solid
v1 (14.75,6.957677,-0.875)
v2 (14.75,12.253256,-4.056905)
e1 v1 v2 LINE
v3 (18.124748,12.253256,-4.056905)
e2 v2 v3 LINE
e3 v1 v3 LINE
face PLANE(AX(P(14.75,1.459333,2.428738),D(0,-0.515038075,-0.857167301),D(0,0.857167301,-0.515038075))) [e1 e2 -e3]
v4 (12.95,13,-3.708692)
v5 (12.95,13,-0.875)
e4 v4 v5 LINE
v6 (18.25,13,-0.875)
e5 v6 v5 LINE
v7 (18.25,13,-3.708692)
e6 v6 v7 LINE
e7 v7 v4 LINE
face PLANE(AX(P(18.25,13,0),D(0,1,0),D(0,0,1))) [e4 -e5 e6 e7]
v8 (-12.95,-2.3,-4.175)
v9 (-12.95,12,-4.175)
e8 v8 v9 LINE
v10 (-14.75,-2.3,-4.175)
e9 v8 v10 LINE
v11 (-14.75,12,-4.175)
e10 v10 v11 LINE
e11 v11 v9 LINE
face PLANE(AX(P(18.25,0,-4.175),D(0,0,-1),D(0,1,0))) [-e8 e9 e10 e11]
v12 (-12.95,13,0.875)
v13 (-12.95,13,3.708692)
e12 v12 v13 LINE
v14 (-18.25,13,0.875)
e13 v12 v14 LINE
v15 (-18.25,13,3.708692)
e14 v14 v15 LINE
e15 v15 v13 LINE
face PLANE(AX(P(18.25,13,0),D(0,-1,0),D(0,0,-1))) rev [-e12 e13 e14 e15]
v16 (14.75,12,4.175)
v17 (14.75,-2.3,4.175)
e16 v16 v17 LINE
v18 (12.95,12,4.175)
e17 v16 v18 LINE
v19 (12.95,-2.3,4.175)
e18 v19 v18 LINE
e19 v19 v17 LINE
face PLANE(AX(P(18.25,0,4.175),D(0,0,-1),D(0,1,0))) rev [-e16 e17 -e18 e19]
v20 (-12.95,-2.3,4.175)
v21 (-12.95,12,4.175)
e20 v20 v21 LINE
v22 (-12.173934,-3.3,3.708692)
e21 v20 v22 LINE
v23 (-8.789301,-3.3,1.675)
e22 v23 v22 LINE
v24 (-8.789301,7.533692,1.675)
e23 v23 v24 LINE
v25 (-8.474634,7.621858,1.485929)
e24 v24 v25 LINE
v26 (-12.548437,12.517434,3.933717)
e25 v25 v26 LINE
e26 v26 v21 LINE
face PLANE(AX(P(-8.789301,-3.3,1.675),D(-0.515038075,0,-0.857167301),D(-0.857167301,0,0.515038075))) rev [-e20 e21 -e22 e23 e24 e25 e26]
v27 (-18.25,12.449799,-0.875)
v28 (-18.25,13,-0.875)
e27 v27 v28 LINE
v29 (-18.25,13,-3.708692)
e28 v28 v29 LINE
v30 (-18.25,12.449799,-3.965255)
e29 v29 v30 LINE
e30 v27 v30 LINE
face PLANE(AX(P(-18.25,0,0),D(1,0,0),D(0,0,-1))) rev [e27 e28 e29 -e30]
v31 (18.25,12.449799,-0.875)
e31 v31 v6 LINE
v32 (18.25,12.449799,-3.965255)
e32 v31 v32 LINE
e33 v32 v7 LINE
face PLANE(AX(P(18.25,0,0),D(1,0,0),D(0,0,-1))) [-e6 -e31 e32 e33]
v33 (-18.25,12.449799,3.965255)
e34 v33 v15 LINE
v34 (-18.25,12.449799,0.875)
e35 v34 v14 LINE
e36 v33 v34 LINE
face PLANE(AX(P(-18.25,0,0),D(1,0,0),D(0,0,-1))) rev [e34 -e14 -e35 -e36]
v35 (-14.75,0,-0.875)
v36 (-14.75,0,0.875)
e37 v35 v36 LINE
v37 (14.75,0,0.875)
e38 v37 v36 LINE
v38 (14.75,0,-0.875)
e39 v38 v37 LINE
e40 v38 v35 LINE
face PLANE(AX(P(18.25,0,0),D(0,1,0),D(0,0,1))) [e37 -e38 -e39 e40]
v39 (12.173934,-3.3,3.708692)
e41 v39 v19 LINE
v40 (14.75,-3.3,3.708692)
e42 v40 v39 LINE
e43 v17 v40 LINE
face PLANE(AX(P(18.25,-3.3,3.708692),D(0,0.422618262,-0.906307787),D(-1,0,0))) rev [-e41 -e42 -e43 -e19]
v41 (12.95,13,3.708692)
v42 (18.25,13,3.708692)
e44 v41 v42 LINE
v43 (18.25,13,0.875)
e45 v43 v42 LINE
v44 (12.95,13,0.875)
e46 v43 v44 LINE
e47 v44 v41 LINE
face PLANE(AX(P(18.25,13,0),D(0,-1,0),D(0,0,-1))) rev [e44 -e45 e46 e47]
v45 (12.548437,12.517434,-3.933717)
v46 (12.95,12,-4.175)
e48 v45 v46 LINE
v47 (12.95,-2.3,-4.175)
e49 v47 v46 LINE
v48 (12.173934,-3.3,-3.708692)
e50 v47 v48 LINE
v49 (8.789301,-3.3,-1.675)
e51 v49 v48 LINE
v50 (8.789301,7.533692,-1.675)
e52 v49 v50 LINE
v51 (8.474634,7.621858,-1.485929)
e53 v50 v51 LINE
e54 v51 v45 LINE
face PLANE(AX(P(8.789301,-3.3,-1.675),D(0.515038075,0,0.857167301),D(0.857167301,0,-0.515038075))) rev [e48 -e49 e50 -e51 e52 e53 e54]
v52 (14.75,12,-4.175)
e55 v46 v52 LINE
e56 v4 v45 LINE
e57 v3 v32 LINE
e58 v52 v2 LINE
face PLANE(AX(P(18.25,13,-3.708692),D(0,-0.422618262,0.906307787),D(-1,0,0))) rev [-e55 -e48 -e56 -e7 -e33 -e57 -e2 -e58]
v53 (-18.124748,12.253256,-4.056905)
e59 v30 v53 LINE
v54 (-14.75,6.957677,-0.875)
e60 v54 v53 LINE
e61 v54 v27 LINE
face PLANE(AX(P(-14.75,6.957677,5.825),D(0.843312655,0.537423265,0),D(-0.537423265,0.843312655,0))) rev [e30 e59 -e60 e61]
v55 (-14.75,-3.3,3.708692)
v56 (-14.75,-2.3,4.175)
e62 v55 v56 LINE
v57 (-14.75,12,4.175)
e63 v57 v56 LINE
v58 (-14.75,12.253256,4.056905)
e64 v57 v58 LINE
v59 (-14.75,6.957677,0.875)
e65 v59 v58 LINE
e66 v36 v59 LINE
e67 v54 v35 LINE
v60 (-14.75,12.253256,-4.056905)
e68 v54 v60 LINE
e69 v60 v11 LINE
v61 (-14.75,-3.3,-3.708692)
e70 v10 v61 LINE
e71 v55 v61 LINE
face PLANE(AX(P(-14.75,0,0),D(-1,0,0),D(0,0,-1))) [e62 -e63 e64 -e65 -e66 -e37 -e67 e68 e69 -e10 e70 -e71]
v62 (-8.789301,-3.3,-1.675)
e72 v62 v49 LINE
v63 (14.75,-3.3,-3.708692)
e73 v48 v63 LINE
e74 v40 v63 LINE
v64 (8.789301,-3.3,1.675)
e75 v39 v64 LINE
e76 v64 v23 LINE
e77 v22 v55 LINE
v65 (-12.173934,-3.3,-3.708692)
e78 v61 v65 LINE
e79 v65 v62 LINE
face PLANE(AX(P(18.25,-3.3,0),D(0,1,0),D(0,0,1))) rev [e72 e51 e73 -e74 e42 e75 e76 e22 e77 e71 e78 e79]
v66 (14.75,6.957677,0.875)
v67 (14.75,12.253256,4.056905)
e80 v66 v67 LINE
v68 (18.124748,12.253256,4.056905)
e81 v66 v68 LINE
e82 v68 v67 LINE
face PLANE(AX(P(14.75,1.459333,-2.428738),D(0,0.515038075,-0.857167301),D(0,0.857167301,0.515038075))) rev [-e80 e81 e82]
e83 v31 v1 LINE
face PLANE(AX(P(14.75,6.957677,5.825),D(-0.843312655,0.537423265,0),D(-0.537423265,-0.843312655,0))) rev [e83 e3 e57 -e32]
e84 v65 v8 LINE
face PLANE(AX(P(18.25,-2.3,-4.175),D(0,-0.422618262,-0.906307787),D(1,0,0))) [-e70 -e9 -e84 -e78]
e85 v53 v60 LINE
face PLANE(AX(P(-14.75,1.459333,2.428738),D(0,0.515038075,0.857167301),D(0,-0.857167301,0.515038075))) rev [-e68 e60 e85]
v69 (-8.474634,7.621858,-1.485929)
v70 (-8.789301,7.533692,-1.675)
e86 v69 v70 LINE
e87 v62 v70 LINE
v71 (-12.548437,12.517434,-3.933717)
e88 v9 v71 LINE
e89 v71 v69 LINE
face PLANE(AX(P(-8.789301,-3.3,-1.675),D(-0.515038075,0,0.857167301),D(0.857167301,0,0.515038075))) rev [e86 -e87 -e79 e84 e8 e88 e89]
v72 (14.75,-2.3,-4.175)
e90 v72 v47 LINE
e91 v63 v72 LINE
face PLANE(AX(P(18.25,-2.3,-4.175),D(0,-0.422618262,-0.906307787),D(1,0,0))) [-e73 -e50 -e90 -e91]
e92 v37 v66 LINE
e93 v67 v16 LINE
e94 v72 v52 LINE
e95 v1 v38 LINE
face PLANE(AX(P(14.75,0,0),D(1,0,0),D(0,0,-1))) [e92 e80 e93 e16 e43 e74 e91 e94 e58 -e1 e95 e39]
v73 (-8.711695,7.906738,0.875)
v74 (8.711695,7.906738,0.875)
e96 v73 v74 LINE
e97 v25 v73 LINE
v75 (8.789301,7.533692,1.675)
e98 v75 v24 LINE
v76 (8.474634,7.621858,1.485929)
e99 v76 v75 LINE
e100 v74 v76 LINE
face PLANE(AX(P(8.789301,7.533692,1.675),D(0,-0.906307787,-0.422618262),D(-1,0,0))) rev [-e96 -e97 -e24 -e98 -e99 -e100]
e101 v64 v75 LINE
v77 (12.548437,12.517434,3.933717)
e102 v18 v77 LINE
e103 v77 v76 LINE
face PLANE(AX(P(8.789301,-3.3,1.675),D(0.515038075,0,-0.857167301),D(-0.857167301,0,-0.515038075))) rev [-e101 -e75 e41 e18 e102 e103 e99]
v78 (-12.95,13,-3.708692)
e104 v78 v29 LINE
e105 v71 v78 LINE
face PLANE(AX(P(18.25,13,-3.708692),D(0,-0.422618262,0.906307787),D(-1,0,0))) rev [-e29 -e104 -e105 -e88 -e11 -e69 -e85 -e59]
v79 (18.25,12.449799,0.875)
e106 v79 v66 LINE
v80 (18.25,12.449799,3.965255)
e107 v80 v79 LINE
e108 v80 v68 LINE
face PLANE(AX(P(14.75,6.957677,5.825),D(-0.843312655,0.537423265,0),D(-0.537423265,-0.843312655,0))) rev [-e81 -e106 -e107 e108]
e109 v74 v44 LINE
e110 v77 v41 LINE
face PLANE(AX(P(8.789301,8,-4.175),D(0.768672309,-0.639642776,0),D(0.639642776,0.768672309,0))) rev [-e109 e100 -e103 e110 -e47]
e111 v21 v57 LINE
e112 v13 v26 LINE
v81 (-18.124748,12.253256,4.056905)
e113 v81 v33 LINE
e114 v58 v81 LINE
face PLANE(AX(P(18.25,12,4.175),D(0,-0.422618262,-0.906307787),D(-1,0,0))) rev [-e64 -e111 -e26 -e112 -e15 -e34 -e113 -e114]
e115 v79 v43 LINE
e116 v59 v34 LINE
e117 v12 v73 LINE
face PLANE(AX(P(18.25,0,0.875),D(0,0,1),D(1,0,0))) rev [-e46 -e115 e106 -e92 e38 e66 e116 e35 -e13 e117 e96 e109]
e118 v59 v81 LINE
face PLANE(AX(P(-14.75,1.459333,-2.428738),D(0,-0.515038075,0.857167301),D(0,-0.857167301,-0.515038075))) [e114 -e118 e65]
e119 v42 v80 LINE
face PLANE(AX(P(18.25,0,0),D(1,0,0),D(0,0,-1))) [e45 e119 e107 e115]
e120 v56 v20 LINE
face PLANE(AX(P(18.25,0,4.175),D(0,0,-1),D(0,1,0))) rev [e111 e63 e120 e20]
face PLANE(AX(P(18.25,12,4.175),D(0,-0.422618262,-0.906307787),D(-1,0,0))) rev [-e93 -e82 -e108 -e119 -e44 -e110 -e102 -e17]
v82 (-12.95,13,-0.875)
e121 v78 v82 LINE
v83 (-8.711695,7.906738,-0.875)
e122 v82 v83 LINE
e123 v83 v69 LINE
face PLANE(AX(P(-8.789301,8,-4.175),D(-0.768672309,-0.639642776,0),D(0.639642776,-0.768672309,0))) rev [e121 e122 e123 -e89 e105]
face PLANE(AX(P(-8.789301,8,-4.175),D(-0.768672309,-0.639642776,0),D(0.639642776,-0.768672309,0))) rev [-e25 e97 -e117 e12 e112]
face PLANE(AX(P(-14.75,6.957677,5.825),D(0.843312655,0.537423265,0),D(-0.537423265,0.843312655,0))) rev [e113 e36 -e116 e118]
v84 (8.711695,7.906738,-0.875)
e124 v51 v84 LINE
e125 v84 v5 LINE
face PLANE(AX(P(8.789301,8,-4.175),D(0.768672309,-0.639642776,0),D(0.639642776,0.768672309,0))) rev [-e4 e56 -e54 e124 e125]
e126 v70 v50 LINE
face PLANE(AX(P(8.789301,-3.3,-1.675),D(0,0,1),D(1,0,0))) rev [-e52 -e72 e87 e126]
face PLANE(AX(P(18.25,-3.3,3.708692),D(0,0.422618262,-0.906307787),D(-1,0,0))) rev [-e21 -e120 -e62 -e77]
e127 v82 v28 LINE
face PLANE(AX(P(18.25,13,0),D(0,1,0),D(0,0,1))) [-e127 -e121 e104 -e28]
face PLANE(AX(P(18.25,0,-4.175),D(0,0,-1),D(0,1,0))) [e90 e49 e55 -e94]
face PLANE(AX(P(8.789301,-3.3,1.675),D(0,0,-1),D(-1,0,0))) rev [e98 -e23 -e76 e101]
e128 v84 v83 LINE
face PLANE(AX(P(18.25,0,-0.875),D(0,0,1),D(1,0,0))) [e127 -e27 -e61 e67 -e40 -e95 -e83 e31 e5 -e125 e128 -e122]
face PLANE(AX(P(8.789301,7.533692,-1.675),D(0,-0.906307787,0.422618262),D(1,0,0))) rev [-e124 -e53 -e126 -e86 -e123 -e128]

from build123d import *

# Parameters (mm, degrees)
SALIENTE_EXTRUIR1_DEPTH = 18.25
CORTAR_EXTRUIR1_START   = -1.8
CORTAR_EXTRUIR1_DEPTH   = 1.7
CORTAR_EXTRUIR2_DEPTH   = 25.823036176
CORTAR_EXTRUIR3_DEPTH   = 24.912026263
CORTAR_EXTRUIR4_REACH   = 37.713
CORTAR_EXTRUIR5_DEPTH   = 10
CHAFL_N2_SIZE           = 1
CHAFL_N2_SIZE_2         = 0.466307658


with BuildPart() as part:
    # Croquis2 → Saliente-Extruir1 (new, symmetric)
    with BuildSketch(Plane(origin=(0, 0, 0), x_dir=(0, 0, -1), z_dir=(1, 0, 0))):
        Polygon((0.875, 0), (0, 0), (0, -3.3), (0.875, -3.3), (4.175, 2.192122292), (4.175, 13), (0.875, 13), align=None)
        Polygon((0, 0), (-0.875, 0), (-0.875, 13), (-4.175, 13), (-4.175, 2.192122292), (-0.875, -3.3), (0, -3.3), align=None)
        Polygon((-4.175, -3.3), (-4.175, 2.192122292), (-0.875, -3.3), align=None)
        Polygon((4.175, -3.3), (0.875, -3.3), (4.175, 2.192122292), align=None)
    extrude(amount=SALIENTE_EXTRUIR1_DEPTH, both=True)

    # Croquis3 → Cortar-Extruir1 (cut)
    with BuildSketch(Plane(origin=(18.25, 0, 0), x_dir=(0, 0, -1), z_dir=(1, 0, 0)).offset(CORTAR_EXTRUIR1_START)):
        Polygon((0, -3.3), (0, 0), (-0.875, 0), (-0.875, 6.957676858), (-4.175, 12.449799149), (-4.175, -3.3), align=None)
        Polygon((0.875, 0), (0, 0), (0, -3.3), (4.175, -3.3), (4.175, 12.449799149), (0.875, 6.957676858), align=None)
    cortar_extruir1 = extrude(amount=-CORTAR_EXTRUIR1_DEPTH, mode=Mode.SUBTRACT)

    # Simetría1: Cortar-Extruir1 across plane
    add(cortar_extruir1.mirror(Plane(origin=(0, 0, 0), x_dir=(0, 0, 1), z_dir=(1, 0, 0))), mode=Mode.SUBTRACT)

    # Croquis4 → Cortar-Extruir2 (cut, through all)
    with BuildSketch(Plane(origin=(0, 13, 0), x_dir=(1, 0, 0), z_dir=(0, 1, 0))):
        Polygon((8.789301294, -1.675), (-8.789301294, -1.675), (-12.95, -4.175), (12.95, -4.175), align=None)
        Polygon((8.789301294, 1.675), (12.95, 4.175), (-12.95, 4.175), (-8.789301294, 1.675), align=None)
    extrude(amount=-CORTAR_EXTRUIR2_DEPTH, mode=Mode.SUBTRACT)

    # Croquis5 → Cortar-Extruir3 (cut, through all)
    with BuildSketch(Plane.XY.offset(4.175)):
        Polygon((-12.95, 13), (12.95, 13), (8.789301294, 8), (-8.789301294, 8), align=None)
    extrude(amount=-CORTAR_EXTRUIR3_DEPTH, mode=Mode.SUBTRACT)

    # Croquis6 → Cortar-Extruir4 (cut, up to next)
    with BuildSketch(Plane(origin=(14.75, 0, 0), x_dir=(0, 0, -1), z_dir=(1, 0, 0)), mode=Mode.PRIVATE) as cortar_extruir4_sk1:
        Polygon((-4.175, -3.3), (4.175, -3.3), (4.175, 12.449799149), (0.875, 6.957676858), (0.875, 0), (-0.875, 0), (-0.875, 6.957676858), (-4.175, 12.449799149), align=None)
    cortar_extruir4_tool1 = extrude(cortar_extruir4_sk1.sketch, amount=CORTAR_EXTRUIR4_REACH, mode=Mode.PRIVATE) & part.part
    cortar_extruir4 = cortar_extruir4_tool1.solids().sort_by_distance((14.75, -3.121737, 0))[0]
    add(cortar_extruir4, mode=Mode.SUBTRACT)

    # Simetría2: Cortar-Extruir4 across plane
    add(cortar_extruir4.mirror(Plane(origin=(0, 0, 0), x_dir=(0, 0, 1), z_dir=(1, 0, 0))), mode=Mode.SUBTRACT)

    # Croquis7 → Cortar-Extruir5 (cut)
    with BuildSketch(Plane(origin=(0, 0, -4.175), x_dir=(-1, 0, 0), z_dir=(0, 0, -1))):
        Polygon((14.75, 6.957676858), (18.25, 12.449799149), (18.25, 6.957676858), align=None)
        Polygon((-18.25, 6.957676858), (-14.75, 6.957676858), (-18.25, 12.449799149), align=None)
    extrude(amount=-CORTAR_EXTRUIR5_DEPTH, mode=Mode.SUBTRACT)

    # Chaflán2
    # the kernel refuses this chamfer: 1, 0.466307658 mm, written as the material it takes off along each edge
    with BuildSketch(Plane(origin=(-11.380276766, 8, 1.675), x_dir=(0, 0.01631116413111048, -0.9998669641130704), z_dir=(1, 0, 0))) as chafl_n2_piece_1_section:
        Polygon((CHAFL_N2_SIZE * 0.999866964113, -CHAFL_N2_SIZE * 0.0163111641311), (-CHAFL_N2_SIZE_2 * 0.0163111641365, -CHAFL_N2_SIZE_2 * 0.999866964445), (0, 0), align=None)
    chafl_n2_piece_1 = extrude(amount=22.760553531, mode=Mode.PRIVATE)
    chafl_n2_piece_1 = split(chafl_n2_piece_1, bisect_by=Plane(origin=(-8.557096722, 7.720954834, 1.652220127), z_dir=(-0.7686723090596509, -0.6396427763094841, 0)), keep=Keep.TOP, mode=Mode.PRIVATE)
    chafl_n2_piece_1 = split(chafl_n2_piece_1, bisect_by=Plane(origin=(-8.661655422, 7.660906137, 1.598302622), z_dir=(0.5150380749100552, 0, 0.8571673007021118)), keep=Keep.TOP, mode=Mode.PRIVATE)
    add(chafl_n2_piece_1, mode=Mode.SUBTRACT)
    with BuildSketch(Plane(origin=(-11.380276766, 8, 1.675), x_dir=(0, 0.01631116413111048, -0.9998669641130704), z_dir=(1, 0, 0))) as chafl_n2_piece_2_section:
        Polygon((CHAFL_N2_SIZE * 0.999866964113, -CHAFL_N2_SIZE * 0.0163111641311), (-CHAFL_N2_SIZE_2 * 0.0163111641365, -CHAFL_N2_SIZE_2 * 0.999866964445), (0, 0), align=None)
    chafl_n2_piece_2 = extrude(amount=22.760553531, mode=Mode.PRIVATE)
    chafl_n2_piece_2 = split(chafl_n2_piece_2, bisect_by=Plane(origin=(-8.541684452, 7.702433581, 1.094162821), z_dir=(0.7686723090596509, 0.6396427763094841, 0)), keep=Keep.TOP, mode=Mode.PRIVATE)
    chafl_n2_piece_2 = split(chafl_n2_piece_2, bisect_by=Plane(origin=(-8.154722375, 7.924668255, 1.293706518), z_dir=(-0.5150380749100552, 0, -0.8571673007021118)), keep=Keep.TOP, mode=Mode.PRIVATE)
    add(chafl_n2_piece_2, mode=Mode.SUBTRACT)
    with BuildSketch(Plane(origin=(-11.380276766, 8, 1.675), x_dir=(0, 0.01631116413111048, -0.9998669641130704), z_dir=(1, 0, 0))) as chafl_n2_piece_3_section:
        Polygon((CHAFL_N2_SIZE * 0.999866964113, -CHAFL_N2_SIZE * 0.0163111641311), (-CHAFL_N2_SIZE_2 * 0.0163111641365, -CHAFL_N2_SIZE_2 * 0.999866964445), (0, 0), align=None)
    chafl_n2_piece_3 = extrude(amount=22.760553531, mode=Mode.PRIVATE)
    chafl_n2_piece_3 = split(chafl_n2_piece_3, bisect_by=Plane(origin=(-5.119611659, 3.590056028, 1.349077222), z_dir=(0.7686723090596509, 0.6396427763094841, 0)), keep=Keep.TOP, mode=Mode.PRIVATE)
    chafl_n2_piece_3 = split(chafl_n2_piece_3, bisect_by=Plane(origin=(5.119611659, 3.590056028, 1.349077222), z_dir=(-0.768672309059651, 0.6396427763094839, 0)), keep=Keep.TOP, mode=Mode.PRIVATE)
    chafl_n2_piece_3 = split(chafl_n2_piece_3, bisect_by=Plane(origin=(2.187600774, 7.850288348, -2.291701861), z_dir=(-0.5150380749100552, 0, 0.8571673007021118)), keep=Keep.TOP, mode=Mode.PRIVATE)
    chafl_n2_piece_3 = split(chafl_n2_piece_3, bisect_by=Plane(origin=(-2.187600774, 7.850288348, -2.291701861), z_dir=(0.5150380749100552, 0, 0.8571673007021118)), keep=Keep.TOP, mode=Mode.PRIVATE)
    add(chafl_n2_piece_3, mode=Mode.SUBTRACT)
    with BuildSketch(Plane(origin=(-11.380276766, 8, 1.675), x_dir=(0, 0.01631116413111048, -0.9998669641130704), z_dir=(1, 0, 0))) as chafl_n2_piece_4_section:
        Polygon((CHAFL_N2_SIZE * 0.999866964113, -CHAFL_N2_SIZE * 0.0163111641311), (-CHAFL_N2_SIZE_2 * 0.0163111641365, -CHAFL_N2_SIZE_2 * 0.999866964445), (0, 0), align=None)
    chafl_n2_piece_4 = extrude(amount=22.760553531, mode=Mode.PRIVATE)
    chafl_n2_piece_4 = split(chafl_n2_piece_4, bisect_by=Plane(origin=(8.557096722, 7.720954834, 1.652220127), z_dir=(0.768672309059651, -0.6396427763094839, 0)), keep=Keep.TOP, mode=Mode.PRIVATE)
    chafl_n2_piece_4 = split(chafl_n2_piece_4, bisect_by=Plane(origin=(8.661655422, 7.660906137, 1.598302622), z_dir=(-0.5150380749100552, 0, 0.8571673007021118)), keep=Keep.TOP, mode=Mode.PRIVATE)
    add(chafl_n2_piece_4, mode=Mode.SUBTRACT)
    with BuildSketch(Plane(origin=(-11.380276766, 8, 1.675), x_dir=(0, 0.01631116413111048, -0.9998669641130704), z_dir=(1, 0, 0))) as chafl_n2_piece_5_section:
        Polygon((CHAFL_N2_SIZE * 0.999866964113, -CHAFL_N2_SIZE * 0.0163111641311), (-CHAFL_N2_SIZE_2 * 0.0163111641365, -CHAFL_N2_SIZE_2 * 0.999866964445), (0, 0), align=None)
    chafl_n2_piece_5 = extrude(amount=22.760553531, mode=Mode.PRIVATE)
    chafl_n2_piece_5 = split(chafl_n2_piece_5, bisect_by=Plane(origin=(8.541684452, 7.702433581, 1.094162821), z_dir=(-0.768672309059651, 0.6396427763094839, 0)), keep=Keep.TOP, mode=Mode.PRIVATE)
    chafl_n2_piece_5 = split(chafl_n2_piece_5, bisect_by=Plane(origin=(8.154722375, 7.924668255, 1.293706518), z_dir=(0.5150380749100552, 0, -0.8571673007021118)), keep=Keep.TOP, mode=Mode.PRIVATE)
    add(chafl_n2_piece_5, mode=Mode.SUBTRACT)
    with BuildSketch(Plane(origin=(11.380276766, 8, -1.675), x_dir=(0, -0.9971975577536775, -0.0748133063705994), z_dir=(-1, 0, 0))) as chafl_n2_piece_6_section:
        Polygon((CHAFL_N2_SIZE_2 * 0.997197558085, CHAFL_N2_SIZE_2 * 0.0748133063955), (-CHAFL_N2_SIZE * 0.0748133063706, CHAFL_N2_SIZE * 0.997197557754), (0, 0), align=None)
    chafl_n2_piece_6 = extrude(amount=22.760553531, mode=Mode.PRIVATE)
    chafl_n2_piece_6 = split(chafl_n2_piece_6, bisect_by=Plane(origin=(8.541684452, 7.702433581, -1.094162821), z_dir=(-0.768672309059651, 0.6396427763094839, 0)), keep=Keep.TOP, mode=Mode.PRIVATE)
    chafl_n2_piece_6 = split(chafl_n2_piece_6, bisect_by=Plane(origin=(8.154722375, 7.924668255, -1.293706518), z_dir=(0.5150380749100552, 0, 0.8571673007021118)), keep=Keep.TOP, mode=Mode.PRIVATE)
    add(chafl_n2_piece_6, mode=Mode.SUBTRACT)
    with BuildSketch(Plane(origin=(11.380276766, 8, -1.675), x_dir=(0, -0.9971975577536775, -0.0748133063705994), z_dir=(-1, 0, 0))) as chafl_n2_piece_7_section:
        Polygon((CHAFL_N2_SIZE_2 * 0.997197558085, CHAFL_N2_SIZE_2 * 0.0748133063955), (-CHAFL_N2_SIZE * 0.0748133063706, CHAFL_N2_SIZE * 0.997197557754), (0, 0), align=None)
    chafl_n2_piece_7 = extrude(amount=22.760553531, mode=Mode.PRIVATE)
    chafl_n2_piece_7 = split(chafl_n2_piece_7, bisect_by=Plane(origin=(8.557096722, 7.720954834, -1.652220127), z_dir=(0.768672309059651, -0.6396427763094839, 0)), keep=Keep.TOP, mode=Mode.PRIVATE)
    chafl_n2_piece_7 = split(chafl_n2_piece_7, bisect_by=Plane(origin=(8.661655422, 7.660906137, -1.598302622), z_dir=(-0.5150380749100552, 0, -0.8571673007021118)), keep=Keep.TOP, mode=Mode.PRIVATE)
    add(chafl_n2_piece_7, mode=Mode.SUBTRACT)
    with BuildSketch(Plane(origin=(11.380276766, 8, -1.675), x_dir=(0, -0.9971975577536775, -0.0748133063705994), z_dir=(-1, 0, 0))) as chafl_n2_piece_8_section:
        Polygon((CHAFL_N2_SIZE_2 * 0.997197558085, CHAFL_N2_SIZE_2 * 0.0748133063955), (-CHAFL_N2_SIZE * 0.0748133063706, CHAFL_N2_SIZE * 0.997197557754), (0, 0), align=None)
    chafl_n2_piece_8 = extrude(amount=22.760553531, mode=Mode.PRIVATE)
    chafl_n2_piece_8 = split(chafl_n2_piece_8, bisect_by=Plane(origin=(5.119611659, 3.590056028, -1.349077222), z_dir=(-0.768672309059651, 0.6396427763094839, 0)), keep=Keep.TOP, mode=Mode.PRIVATE)
    chafl_n2_piece_8 = split(chafl_n2_piece_8, bisect_by=Plane(origin=(2.187600774, 7.850288348, 2.291701861), z_dir=(-0.5150380749100552, 0, -0.8571673007021118)), keep=Keep.TOP, mode=Mode.PRIVATE)
    chafl_n2_piece_8 = split(chafl_n2_piece_8, bisect_by=Plane(origin=(-2.187600774, 7.850288348, 2.291701861), z_dir=(0.5150380749100552, 0, -0.8571673007021118)), keep=Keep.TOP, mode=Mode.PRIVATE)
    chafl_n2_piece_8 = split(chafl_n2_piece_8, bisect_by=Plane(origin=(-5.119611659, 3.590056028, -1.349077222), z_dir=(0.7686723090596509, 0.6396427763094841, 0)), keep=Keep.TOP, mode=Mode.PRIVATE)
    add(chafl_n2_piece_8, mode=Mode.SUBTRACT)
    with BuildSketch(Plane(origin=(11.380276766, 8, -1.675), x_dir=(0, -0.9971975577536775, -0.0748133063705994), z_dir=(-1, 0, 0))) as chafl_n2_piece_9_section:
        Polygon((CHAFL_N2_SIZE_2 * 0.997197558085, CHAFL_N2_SIZE_2 * 0.0748133063955), (-CHAFL_N2_SIZE * 0.0748133063706, CHAFL_N2_SIZE * 0.997197557754), (0, 0), align=None)
    chafl_n2_piece_9 = extrude(amount=22.760553531, mode=Mode.PRIVATE)
    chafl_n2_piece_9 = split(chafl_n2_piece_9, bisect_by=Plane(origin=(-8.154722375, 7.924668255, -1.293706518), z_dir=(-0.5150380749100552, 0, 0.8571673007021118)), keep=Keep.TOP, mode=Mode.PRIVATE)
    chafl_n2_piece_9 = split(chafl_n2_piece_9, bisect_by=Plane(origin=(-8.541684452, 7.702433581, -1.094162821), z_dir=(0.7686723090596509, 0.6396427763094841, 0)), keep=Keep.TOP, mode=Mode.PRIVATE)
    add(chafl_n2_piece_9, mode=Mode.SUBTRACT)
    with BuildSketch(Plane(origin=(11.380276766, 8, -1.675), x_dir=(0, -0.9971975577536775, -0.0748133063705994), z_dir=(-1, 0, 0))) as chafl_n2_piece_10_section:
        Polygon((CHAFL_N2_SIZE_2 * 0.997197558085, CHAFL_N2_SIZE_2 * 0.0748133063955), (-CHAFL_N2_SIZE * 0.0748133063706, CHAFL_N2_SIZE * 0.997197557754), (0, 0), align=None)
    chafl_n2_piece_10 = extrude(amount=22.760553531, mode=Mode.PRIVATE)
    chafl_n2_piece_10 = split(chafl_n2_piece_10, bisect_by=Plane(origin=(-8.661655422, 7.660906137, -1.598302622), z_dir=(0.5150380749100552, 0, -0.8571673007021118)), keep=Keep.TOP, mode=Mode.PRIVATE)
    chafl_n2_piece_10 = split(chafl_n2_piece_10, bisect_by=Plane(origin=(-8.557096722, 7.720954834, -1.652220127), z_dir=(-0.7686723090596509, -0.6396427763094841, 0)), keep=Keep.TOP, mode=Mode.PRIVATE)
    add(chafl_n2_piece_10, mode=Mode.SUBTRACT)
    with BuildSketch(Plane(origin=(20.840975471, 13, 4.175), x_dir=(0, -0.9998669641130704, 0.016311164131110487), z_dir=(-1, 0, 0)), Plane(origin=(-20.840975471, 13, -4.175), x_dir=(0, -0.9998669641130704, -0.016311164131110487), z_dir=(1, 0, 0))) as chafl_n2_piece_11:
        Polygon((CHAFL_N2_SIZE * 0.999866964113, -CHAFL_N2_SIZE * 0.0163111641311), (-CHAFL_N2_SIZE_2 * 0.0163111641365, -CHAFL_N2_SIZE_2 * 0.999866964445), (0, 0), align=None)
    extrude(amount=10.481950943, mode=Mode.SUBTRACT)
    with BuildSketch(Plane(origin=(10.359024529, -3.3, 4.175), x_dir=(0, 0.9998669641130704, 0.01631116413111048), z_dir=(1, 0, 0)), Plane(origin=(-17.340975471, -3.3, 4.175), x_dir=(0, 0.9998669641130704, 0.01631116413111048), z_dir=(1, 0, 0))) as chafl_n2_piece_12:
        Polygon((CHAFL_N2_SIZE * 0.999866964113, -CHAFL_N2_SIZE * 0.0163111641311), (-CHAFL_N2_SIZE_2 * 0.0163111641365, -CHAFL_N2_SIZE_2 * 0.999866964445), (0, 0), align=None)
    extrude(amount=6.981950943, mode=Mode.SUBTRACT)
    with BuildSketch(Plane(origin=(-10.359024529, 13, 4.175), x_dir=(0, 0.07481330637059887, -0.9971975577536775), z_dir=(-1, 0, 0)), Plane(origin=(10.359024529, 13, -4.175), x_dir=(0, 0.07481330637059887, 0.9971975577536775), z_dir=(1, 0, 0))) as chafl_n2_piece_13:
        Polygon((CHAFL_N2_SIZE_2 * 0.997197558085, CHAFL_N2_SIZE_2 * 0.0748133063955), (-CHAFL_N2_SIZE * 0.0748133063706, CHAFL_N2_SIZE * 0.997197557754), (0, 0), align=None)
    extrude(amount=10.481950943, mode=Mode.SUBTRACT)
    with BuildSketch(Plane(origin=(-17.340975471, -3.3, -4.175), x_dir=(0, 0.9998669641130704, -0.01631116413111048), z_dir=(1, 0, 0)), Plane(origin=(10.359024529, -3.3, -4.175), x_dir=(0, 0.9998669641130704, -0.01631116413111048), z_dir=(1, 0, 0))) as chafl_n2_piece_14:
        Polygon((CHAFL_N2_SIZE * 0.999866964113, CHAFL_N2_SIZE * 0.0163111641311), (-CHAFL_N2_SIZE_2 * 0.0163111641365, CHAFL_N2_SIZE_2 * 0.999866964445), (0, 0), align=None)
    extrude(amount=6.981950943, mode=Mode.SUBTRACT)


solid = part.part
